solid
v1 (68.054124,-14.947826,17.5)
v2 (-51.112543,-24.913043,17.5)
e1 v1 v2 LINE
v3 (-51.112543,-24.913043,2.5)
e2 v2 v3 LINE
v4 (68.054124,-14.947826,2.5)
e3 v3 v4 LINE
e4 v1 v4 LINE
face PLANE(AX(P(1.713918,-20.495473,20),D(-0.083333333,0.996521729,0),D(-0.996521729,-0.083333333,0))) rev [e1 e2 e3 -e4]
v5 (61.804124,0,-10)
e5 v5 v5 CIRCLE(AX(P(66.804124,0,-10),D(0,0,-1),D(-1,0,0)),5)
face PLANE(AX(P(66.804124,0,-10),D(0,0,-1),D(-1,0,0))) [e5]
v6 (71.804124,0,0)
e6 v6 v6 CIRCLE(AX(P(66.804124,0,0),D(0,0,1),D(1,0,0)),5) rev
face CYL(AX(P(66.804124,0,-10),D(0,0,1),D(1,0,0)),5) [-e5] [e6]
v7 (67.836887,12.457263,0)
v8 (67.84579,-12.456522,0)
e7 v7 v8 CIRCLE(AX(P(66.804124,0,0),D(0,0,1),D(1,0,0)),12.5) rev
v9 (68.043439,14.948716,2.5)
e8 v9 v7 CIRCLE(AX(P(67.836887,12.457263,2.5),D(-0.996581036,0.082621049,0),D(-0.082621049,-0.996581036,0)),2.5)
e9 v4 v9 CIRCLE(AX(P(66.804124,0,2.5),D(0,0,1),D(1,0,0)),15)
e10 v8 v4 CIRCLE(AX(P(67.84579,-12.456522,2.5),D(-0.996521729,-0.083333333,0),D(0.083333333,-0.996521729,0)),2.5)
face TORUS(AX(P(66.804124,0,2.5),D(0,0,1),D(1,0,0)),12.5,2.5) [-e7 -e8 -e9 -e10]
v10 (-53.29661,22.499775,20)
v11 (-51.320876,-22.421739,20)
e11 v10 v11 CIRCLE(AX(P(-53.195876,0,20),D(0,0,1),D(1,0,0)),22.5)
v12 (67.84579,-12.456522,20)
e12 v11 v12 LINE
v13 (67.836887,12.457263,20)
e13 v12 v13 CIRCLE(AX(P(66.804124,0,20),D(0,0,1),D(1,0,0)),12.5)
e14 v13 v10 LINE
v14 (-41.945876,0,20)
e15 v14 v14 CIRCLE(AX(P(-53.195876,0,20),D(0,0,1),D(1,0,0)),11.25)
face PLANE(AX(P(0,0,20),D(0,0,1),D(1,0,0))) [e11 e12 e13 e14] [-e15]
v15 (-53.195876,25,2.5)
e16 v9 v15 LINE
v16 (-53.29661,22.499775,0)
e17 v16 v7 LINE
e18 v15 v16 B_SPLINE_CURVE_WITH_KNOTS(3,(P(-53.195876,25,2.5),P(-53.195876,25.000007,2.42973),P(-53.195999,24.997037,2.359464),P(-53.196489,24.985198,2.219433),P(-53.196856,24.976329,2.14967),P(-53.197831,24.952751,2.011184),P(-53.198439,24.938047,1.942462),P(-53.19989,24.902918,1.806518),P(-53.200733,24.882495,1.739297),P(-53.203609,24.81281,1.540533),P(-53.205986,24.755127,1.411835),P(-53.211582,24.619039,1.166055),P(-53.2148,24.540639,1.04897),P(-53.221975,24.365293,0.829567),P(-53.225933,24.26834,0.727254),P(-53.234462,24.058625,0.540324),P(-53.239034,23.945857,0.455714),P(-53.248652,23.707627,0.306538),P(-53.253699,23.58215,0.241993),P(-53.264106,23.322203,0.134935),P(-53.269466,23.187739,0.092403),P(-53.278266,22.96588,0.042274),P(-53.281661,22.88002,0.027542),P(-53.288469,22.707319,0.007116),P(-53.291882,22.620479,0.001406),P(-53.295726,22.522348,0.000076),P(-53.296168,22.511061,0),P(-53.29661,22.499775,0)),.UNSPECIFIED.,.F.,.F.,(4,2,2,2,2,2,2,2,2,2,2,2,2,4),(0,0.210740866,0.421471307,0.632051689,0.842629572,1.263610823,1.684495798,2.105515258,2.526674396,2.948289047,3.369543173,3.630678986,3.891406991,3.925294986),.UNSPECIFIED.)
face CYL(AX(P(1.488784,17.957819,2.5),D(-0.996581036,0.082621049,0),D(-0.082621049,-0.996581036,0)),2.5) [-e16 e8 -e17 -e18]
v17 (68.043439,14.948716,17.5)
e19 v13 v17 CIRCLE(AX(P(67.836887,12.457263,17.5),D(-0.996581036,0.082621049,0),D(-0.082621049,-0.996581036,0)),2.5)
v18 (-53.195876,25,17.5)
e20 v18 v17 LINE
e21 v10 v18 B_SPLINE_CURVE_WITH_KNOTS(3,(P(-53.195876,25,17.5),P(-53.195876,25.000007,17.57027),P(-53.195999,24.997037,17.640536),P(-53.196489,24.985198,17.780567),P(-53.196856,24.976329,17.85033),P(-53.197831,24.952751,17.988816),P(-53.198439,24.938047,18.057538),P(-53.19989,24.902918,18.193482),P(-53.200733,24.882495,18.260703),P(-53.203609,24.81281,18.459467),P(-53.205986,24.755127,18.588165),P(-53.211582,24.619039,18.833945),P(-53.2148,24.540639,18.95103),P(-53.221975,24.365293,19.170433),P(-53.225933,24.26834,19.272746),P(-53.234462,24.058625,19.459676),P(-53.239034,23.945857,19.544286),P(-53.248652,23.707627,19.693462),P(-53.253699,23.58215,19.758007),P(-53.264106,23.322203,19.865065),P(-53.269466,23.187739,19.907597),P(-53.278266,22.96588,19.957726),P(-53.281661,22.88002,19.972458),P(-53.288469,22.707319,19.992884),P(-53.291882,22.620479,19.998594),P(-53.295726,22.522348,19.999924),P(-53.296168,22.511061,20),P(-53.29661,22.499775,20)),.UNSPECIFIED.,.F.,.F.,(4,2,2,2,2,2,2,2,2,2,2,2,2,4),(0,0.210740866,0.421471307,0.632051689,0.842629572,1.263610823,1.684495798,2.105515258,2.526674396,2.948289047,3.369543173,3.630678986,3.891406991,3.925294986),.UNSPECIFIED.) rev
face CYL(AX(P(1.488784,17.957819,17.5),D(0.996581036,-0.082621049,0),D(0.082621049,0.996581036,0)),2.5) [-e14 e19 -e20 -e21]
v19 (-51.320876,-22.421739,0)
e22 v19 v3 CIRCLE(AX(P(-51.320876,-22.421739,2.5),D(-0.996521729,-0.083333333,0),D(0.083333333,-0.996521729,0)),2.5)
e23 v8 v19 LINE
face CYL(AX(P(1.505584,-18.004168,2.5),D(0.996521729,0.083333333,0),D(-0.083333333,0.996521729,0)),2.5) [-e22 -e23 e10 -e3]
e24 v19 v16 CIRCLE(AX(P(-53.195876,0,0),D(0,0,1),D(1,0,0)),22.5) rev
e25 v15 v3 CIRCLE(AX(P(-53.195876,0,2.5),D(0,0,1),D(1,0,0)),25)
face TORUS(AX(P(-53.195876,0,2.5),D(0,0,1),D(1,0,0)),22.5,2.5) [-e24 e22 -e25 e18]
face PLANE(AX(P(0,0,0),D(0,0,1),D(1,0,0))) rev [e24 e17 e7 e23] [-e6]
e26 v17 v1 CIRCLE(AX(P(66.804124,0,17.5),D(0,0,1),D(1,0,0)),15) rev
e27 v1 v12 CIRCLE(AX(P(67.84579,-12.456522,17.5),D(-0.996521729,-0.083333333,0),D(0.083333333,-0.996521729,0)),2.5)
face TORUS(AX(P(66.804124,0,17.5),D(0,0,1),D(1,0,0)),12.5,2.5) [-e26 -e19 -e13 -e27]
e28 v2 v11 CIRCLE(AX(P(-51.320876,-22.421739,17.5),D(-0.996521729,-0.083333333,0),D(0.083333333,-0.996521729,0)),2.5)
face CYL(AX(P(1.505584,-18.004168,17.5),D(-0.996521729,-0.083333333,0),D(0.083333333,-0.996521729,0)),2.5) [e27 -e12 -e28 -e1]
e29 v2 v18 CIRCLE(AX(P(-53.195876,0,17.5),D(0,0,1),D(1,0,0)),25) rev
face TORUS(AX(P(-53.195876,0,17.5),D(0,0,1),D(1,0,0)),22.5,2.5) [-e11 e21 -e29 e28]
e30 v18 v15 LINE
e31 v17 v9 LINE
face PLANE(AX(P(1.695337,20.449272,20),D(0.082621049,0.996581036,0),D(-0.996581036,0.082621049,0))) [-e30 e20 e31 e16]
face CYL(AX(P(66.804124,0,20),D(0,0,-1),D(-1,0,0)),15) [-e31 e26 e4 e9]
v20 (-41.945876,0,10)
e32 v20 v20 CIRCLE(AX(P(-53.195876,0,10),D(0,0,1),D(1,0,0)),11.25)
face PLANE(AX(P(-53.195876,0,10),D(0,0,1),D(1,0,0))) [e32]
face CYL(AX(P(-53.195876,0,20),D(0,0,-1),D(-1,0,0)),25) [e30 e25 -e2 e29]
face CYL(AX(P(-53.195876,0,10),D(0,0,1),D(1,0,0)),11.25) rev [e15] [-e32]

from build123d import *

# Parameters (mm, degrees)
BOSS_EXTRUDE1_DEPTH = 20
SKETCH2_R           = 5
BOSS_EXTRUDE2_DEPTH = 10
SKETCH3_R           = 11.25
CUT_EXTRUDE1_DEPTH  = 10
FILLET1_R           = 2.5
FILLET2_R           = 2.5


with BuildPart() as part:
    # Sketch1 → Boss-Extrude1 (new body)
    with BuildSketch(Plane.XY):
        with BuildLine():
            Line((-49.078947743, 24.658688111), (-53.195876289, 25))
            ThreePointArc((-53.195876289, 25), (-78.174127632, -1.04257365), (-51.112542955, -24.913043215))
            Line((-51.112542955, -24.913043215), (68.054123711, -14.947825929))
            ThreePointArc((68.054123711, -14.947825929), (81.804122753, 0.005360617), (68.04343945, 14.948715547))
            Line((68.04343945, 14.948715547), (-49.078947743, 24.658688111))
        make_face()
    extrude(amount=BOSS_EXTRUDE1_DEPTH)

    # Sketch2 → Boss-Extrude2 (add)
    with BuildSketch(Plane(origin=(0, 0, 0), x_dir=(-1, 0, 0), z_dir=(0, 0, -1))):
        with Locations(Location((-66.804123711, 0, 0), (0, 0, 180))):
            Circle(SKETCH2_R)
    extrude(amount=BOSS_EXTRUDE2_DEPTH)

    # Sketch3 → Cut-Extrude1 (cut)
    with BuildSketch(Plane.XY.offset(20)):
        with Locations((-53.195876289, 0)):
            Circle(SKETCH3_R)
    extrude(amount=-CUT_EXTRUDE1_DEPTH, mode=Mode.SUBTRACT)

    # Fillet1
    # the kernel refuses this fillet: 2.5 mm, written as the material it takes off along each edge
    with BuildSketch(Plane(origin=(66.804123711, 0, 20), x_dir=(0.08333333333333336, -0.9965217285917832, 0), z_dir=(-0.9965217285917832, -0.08333333333333336, 0))) as fillet1_piece_1:
        with BuildLine():
            CenterArc((15 - FILLET1_R, -FILLET1_R), FILLET1_R, 0, 90)
            Line((15 - FILLET1_R, 0), (15 - FILLET1_R, FILLET1_R * 0.02))
            Line((15 - FILLET1_R, FILLET1_R * 0.02), (15 + FILLET1_R * 0.02, FILLET1_R * 0.02))
            Line((15 + FILLET1_R * 0.02, FILLET1_R * 0.02), (15 + FILLET1_R * 0.02, -FILLET1_R))
            Line((15 + FILLET1_R * 0.02, -FILLET1_R), (15, -FILLET1_R))
        make_face()
    revolve(axis=Axis((66.804123711, 0, 20), (0, 0, 1)), revolution_arc=170.480568403, mode=Mode.SUBTRACT)
    with BuildSketch(Plane(origin=(-55.68732888, 25.206552623, 20), x_dir=(-0.08262104926117214, -0.9965810364536258, 0), z_dir=(0.9965810364536258, -0.08262104926117214, 0))) as fillet1_piece_2:
        with BuildLine():
            CenterArc((FILLET1_R, FILLET1_R), FILLET1_R, 180, 90)
            Line((0, FILLET1_R), (-FILLET1_R * 0.02, FILLET1_R))
            Line((-FILLET1_R * 0.02, FILLET1_R), (-FILLET1_R * 0.02, -FILLET1_R * 0.02))
            Line((-FILLET1_R * 0.02, -FILLET1_R * 0.02), (FILLET1_R, -FILLET1_R * 0.02))
            Line((FILLET1_R, -FILLET1_R * 0.02), (FILLET1_R, 0))
        make_face()
    extrude(amount=124.155250606, mode=Mode.SUBTRACT)
    with BuildSketch(Plane(origin=(-53.195876289, 0, 20), x_dir=(0.10000205270336067, 0.994987230800031, 0), z_dir=(0.994987230800031, -0.10000205270336067, 0))) as fillet1_piece_3:
        with BuildLine():
            CenterArc((25 - FILLET1_R, -FILLET1_R), FILLET1_R, 0, 90)
            Line((25 - FILLET1_R, 0), (25 - FILLET1_R, FILLET1_R * 0.02))
            Line((25 - FILLET1_R, FILLET1_R * 0.02), (25 + FILLET1_R * 0.02, FILLET1_R * 0.02))
            Line((25 + FILLET1_R * 0.02, FILLET1_R * 0.02), (25 + FILLET1_R * 0.02, -FILLET1_R))
            Line((25 + FILLET1_R * 0.02, -FILLET1_R), (25, -FILLET1_R))
        make_face()
    revolve(axis=Axis((-53.195876289, 0, 20), (0, 0, 1)), revolution_arc=190.519480528, mode=Mode.SUBTRACT)
    with BuildSketch(Plane(origin=(-51.112542955, -24.913043215, 20), x_dir=(0, 0, -1), z_dir=(0.9965217285917832, 0.08333333333333336, 0))) as fillet1_piece_4:
        with BuildLine():
            CenterArc((FILLET1_R, FILLET1_R), FILLET1_R, 180, 90)
            Line((0, FILLET1_R), (-FILLET1_R * 0.02, FILLET1_R))
            Line((-FILLET1_R * 0.02, FILLET1_R), (-FILLET1_R * 0.02, -FILLET1_R * 0.02))
            Line((-FILLET1_R * 0.02, -FILLET1_R * 0.02), (FILLET1_R, -FILLET1_R * 0.02))
            Line((FILLET1_R, -FILLET1_R * 0.02), (FILLET1_R, 0))
        make_face()
    extrude(amount=119.582607431, mode=Mode.SUBTRACT)

    # Fillet2
    # the kernel refuses this fillet: 2.5 mm, written as the material it takes off along each edge
    with BuildSketch(Plane(origin=(-53.195876289, 0, 0), x_dir=(0.10000205270336067, 0.994987230800031, 0), z_dir=(0.994987230800031, -0.10000205270336067, 0))) as fillet2_piece_1:
        with BuildLine():
            CenterArc((25 - FILLET2_R, FILLET2_R), FILLET2_R, 270, 90)
            Line((25, FILLET2_R), (25 + FILLET2_R * 0.02, FILLET2_R))
            Line((25 + FILLET2_R * 0.02, FILLET2_R), (25 + FILLET2_R * 0.02, -FILLET2_R * 0.02))
            Line((25 + FILLET2_R * 0.02, -FILLET2_R * 0.02), (25 - FILLET2_R, -FILLET2_R * 0.02))
            Line((25 - FILLET2_R, -FILLET2_R * 0.02), (25 - FILLET2_R, 0))
        make_face()
    revolve(axis=Axis((-53.195876289, 0, 0), (0, 0, 1)), revolution_arc=190.519480528, mode=Mode.SUBTRACT)
    with BuildSketch(Plane(origin=(68.04343945, 14.948715547, 0), x_dir=(-0.08262104926117214, -0.9965810364536258, 0), z_dir=(-0.9965810364536258, 0.08262104926117214, 0))) as fillet2_piece_2:
        with BuildLine():
            CenterArc((FILLET2_R, FILLET2_R), FILLET2_R, 180, 90)
            Line((0, FILLET2_R), (-FILLET2_R * 0.02, FILLET2_R))
            Line((-FILLET2_R * 0.02, FILLET2_R), (-FILLET2_R * 0.02, -FILLET2_R * 0.02))
            Line((-FILLET2_R * 0.02, -FILLET2_R * 0.02), (FILLET2_R, -FILLET2_R * 0.02))
            Line((FILLET2_R, -FILLET2_R * 0.02), (FILLET2_R, 0))
        make_face()
    extrude(amount=124.155250606, mode=Mode.SUBTRACT)
    with BuildSketch(Plane(origin=(66.804123711, 0, 0), x_dir=(0.08333333333333336, -0.9965217285917832, 0), z_dir=(-0.9965217285917832, -0.08333333333333336, 0))) as fillet2_piece_3:
        with BuildLine():
            CenterArc((15 - FILLET2_R, FILLET2_R), FILLET2_R, 270, 90)
            Line((15, FILLET2_R), (15 + FILLET2_R * 0.02, FILLET2_R))
            Line((15 + FILLET2_R * 0.02, FILLET2_R), (15 + FILLET2_R * 0.02, -FILLET2_R * 0.02))
            Line((15 + FILLET2_R * 0.02, -FILLET2_R * 0.02), (15 - FILLET2_R, -FILLET2_R * 0.02))
            Line((15 - FILLET2_R, -FILLET2_R * 0.02), (15 - FILLET2_R, 0))
        make_face()
    revolve(axis=Axis((66.804123711, 0, 0), (0, 0, 1)), revolution_arc=170.480568403, mode=Mode.SUBTRACT)
    with BuildSketch(Plane(origin=(-51.112542955, -24.913043215, 0), x_dir=(0, 0, 1), z_dir=(0.9965217285917832, 0.08333333333333336, 0))) as fillet2_piece_4:
        with BuildLine():
            CenterArc((FILLET2_R, -FILLET2_R), FILLET2_R, 90, 90)
            Line((0, -FILLET2_R), (-FILLET2_R * 0.02, -FILLET2_R))
            Line((-FILLET2_R * 0.02, -FILLET2_R), (-FILLET2_R * 0.02, FILLET2_R * 0.02))
            Line((-FILLET2_R * 0.02, FILLET2_R * 0.02), (FILLET2_R, FILLET2_R * 0.02))
            Line((FILLET2_R, FILLET2_R * 0.02), (FILLET2_R, 0))
        make_face()
    extrude(amount=119.582607431, mode=Mode.SUBTRACT)


solid = part.part
